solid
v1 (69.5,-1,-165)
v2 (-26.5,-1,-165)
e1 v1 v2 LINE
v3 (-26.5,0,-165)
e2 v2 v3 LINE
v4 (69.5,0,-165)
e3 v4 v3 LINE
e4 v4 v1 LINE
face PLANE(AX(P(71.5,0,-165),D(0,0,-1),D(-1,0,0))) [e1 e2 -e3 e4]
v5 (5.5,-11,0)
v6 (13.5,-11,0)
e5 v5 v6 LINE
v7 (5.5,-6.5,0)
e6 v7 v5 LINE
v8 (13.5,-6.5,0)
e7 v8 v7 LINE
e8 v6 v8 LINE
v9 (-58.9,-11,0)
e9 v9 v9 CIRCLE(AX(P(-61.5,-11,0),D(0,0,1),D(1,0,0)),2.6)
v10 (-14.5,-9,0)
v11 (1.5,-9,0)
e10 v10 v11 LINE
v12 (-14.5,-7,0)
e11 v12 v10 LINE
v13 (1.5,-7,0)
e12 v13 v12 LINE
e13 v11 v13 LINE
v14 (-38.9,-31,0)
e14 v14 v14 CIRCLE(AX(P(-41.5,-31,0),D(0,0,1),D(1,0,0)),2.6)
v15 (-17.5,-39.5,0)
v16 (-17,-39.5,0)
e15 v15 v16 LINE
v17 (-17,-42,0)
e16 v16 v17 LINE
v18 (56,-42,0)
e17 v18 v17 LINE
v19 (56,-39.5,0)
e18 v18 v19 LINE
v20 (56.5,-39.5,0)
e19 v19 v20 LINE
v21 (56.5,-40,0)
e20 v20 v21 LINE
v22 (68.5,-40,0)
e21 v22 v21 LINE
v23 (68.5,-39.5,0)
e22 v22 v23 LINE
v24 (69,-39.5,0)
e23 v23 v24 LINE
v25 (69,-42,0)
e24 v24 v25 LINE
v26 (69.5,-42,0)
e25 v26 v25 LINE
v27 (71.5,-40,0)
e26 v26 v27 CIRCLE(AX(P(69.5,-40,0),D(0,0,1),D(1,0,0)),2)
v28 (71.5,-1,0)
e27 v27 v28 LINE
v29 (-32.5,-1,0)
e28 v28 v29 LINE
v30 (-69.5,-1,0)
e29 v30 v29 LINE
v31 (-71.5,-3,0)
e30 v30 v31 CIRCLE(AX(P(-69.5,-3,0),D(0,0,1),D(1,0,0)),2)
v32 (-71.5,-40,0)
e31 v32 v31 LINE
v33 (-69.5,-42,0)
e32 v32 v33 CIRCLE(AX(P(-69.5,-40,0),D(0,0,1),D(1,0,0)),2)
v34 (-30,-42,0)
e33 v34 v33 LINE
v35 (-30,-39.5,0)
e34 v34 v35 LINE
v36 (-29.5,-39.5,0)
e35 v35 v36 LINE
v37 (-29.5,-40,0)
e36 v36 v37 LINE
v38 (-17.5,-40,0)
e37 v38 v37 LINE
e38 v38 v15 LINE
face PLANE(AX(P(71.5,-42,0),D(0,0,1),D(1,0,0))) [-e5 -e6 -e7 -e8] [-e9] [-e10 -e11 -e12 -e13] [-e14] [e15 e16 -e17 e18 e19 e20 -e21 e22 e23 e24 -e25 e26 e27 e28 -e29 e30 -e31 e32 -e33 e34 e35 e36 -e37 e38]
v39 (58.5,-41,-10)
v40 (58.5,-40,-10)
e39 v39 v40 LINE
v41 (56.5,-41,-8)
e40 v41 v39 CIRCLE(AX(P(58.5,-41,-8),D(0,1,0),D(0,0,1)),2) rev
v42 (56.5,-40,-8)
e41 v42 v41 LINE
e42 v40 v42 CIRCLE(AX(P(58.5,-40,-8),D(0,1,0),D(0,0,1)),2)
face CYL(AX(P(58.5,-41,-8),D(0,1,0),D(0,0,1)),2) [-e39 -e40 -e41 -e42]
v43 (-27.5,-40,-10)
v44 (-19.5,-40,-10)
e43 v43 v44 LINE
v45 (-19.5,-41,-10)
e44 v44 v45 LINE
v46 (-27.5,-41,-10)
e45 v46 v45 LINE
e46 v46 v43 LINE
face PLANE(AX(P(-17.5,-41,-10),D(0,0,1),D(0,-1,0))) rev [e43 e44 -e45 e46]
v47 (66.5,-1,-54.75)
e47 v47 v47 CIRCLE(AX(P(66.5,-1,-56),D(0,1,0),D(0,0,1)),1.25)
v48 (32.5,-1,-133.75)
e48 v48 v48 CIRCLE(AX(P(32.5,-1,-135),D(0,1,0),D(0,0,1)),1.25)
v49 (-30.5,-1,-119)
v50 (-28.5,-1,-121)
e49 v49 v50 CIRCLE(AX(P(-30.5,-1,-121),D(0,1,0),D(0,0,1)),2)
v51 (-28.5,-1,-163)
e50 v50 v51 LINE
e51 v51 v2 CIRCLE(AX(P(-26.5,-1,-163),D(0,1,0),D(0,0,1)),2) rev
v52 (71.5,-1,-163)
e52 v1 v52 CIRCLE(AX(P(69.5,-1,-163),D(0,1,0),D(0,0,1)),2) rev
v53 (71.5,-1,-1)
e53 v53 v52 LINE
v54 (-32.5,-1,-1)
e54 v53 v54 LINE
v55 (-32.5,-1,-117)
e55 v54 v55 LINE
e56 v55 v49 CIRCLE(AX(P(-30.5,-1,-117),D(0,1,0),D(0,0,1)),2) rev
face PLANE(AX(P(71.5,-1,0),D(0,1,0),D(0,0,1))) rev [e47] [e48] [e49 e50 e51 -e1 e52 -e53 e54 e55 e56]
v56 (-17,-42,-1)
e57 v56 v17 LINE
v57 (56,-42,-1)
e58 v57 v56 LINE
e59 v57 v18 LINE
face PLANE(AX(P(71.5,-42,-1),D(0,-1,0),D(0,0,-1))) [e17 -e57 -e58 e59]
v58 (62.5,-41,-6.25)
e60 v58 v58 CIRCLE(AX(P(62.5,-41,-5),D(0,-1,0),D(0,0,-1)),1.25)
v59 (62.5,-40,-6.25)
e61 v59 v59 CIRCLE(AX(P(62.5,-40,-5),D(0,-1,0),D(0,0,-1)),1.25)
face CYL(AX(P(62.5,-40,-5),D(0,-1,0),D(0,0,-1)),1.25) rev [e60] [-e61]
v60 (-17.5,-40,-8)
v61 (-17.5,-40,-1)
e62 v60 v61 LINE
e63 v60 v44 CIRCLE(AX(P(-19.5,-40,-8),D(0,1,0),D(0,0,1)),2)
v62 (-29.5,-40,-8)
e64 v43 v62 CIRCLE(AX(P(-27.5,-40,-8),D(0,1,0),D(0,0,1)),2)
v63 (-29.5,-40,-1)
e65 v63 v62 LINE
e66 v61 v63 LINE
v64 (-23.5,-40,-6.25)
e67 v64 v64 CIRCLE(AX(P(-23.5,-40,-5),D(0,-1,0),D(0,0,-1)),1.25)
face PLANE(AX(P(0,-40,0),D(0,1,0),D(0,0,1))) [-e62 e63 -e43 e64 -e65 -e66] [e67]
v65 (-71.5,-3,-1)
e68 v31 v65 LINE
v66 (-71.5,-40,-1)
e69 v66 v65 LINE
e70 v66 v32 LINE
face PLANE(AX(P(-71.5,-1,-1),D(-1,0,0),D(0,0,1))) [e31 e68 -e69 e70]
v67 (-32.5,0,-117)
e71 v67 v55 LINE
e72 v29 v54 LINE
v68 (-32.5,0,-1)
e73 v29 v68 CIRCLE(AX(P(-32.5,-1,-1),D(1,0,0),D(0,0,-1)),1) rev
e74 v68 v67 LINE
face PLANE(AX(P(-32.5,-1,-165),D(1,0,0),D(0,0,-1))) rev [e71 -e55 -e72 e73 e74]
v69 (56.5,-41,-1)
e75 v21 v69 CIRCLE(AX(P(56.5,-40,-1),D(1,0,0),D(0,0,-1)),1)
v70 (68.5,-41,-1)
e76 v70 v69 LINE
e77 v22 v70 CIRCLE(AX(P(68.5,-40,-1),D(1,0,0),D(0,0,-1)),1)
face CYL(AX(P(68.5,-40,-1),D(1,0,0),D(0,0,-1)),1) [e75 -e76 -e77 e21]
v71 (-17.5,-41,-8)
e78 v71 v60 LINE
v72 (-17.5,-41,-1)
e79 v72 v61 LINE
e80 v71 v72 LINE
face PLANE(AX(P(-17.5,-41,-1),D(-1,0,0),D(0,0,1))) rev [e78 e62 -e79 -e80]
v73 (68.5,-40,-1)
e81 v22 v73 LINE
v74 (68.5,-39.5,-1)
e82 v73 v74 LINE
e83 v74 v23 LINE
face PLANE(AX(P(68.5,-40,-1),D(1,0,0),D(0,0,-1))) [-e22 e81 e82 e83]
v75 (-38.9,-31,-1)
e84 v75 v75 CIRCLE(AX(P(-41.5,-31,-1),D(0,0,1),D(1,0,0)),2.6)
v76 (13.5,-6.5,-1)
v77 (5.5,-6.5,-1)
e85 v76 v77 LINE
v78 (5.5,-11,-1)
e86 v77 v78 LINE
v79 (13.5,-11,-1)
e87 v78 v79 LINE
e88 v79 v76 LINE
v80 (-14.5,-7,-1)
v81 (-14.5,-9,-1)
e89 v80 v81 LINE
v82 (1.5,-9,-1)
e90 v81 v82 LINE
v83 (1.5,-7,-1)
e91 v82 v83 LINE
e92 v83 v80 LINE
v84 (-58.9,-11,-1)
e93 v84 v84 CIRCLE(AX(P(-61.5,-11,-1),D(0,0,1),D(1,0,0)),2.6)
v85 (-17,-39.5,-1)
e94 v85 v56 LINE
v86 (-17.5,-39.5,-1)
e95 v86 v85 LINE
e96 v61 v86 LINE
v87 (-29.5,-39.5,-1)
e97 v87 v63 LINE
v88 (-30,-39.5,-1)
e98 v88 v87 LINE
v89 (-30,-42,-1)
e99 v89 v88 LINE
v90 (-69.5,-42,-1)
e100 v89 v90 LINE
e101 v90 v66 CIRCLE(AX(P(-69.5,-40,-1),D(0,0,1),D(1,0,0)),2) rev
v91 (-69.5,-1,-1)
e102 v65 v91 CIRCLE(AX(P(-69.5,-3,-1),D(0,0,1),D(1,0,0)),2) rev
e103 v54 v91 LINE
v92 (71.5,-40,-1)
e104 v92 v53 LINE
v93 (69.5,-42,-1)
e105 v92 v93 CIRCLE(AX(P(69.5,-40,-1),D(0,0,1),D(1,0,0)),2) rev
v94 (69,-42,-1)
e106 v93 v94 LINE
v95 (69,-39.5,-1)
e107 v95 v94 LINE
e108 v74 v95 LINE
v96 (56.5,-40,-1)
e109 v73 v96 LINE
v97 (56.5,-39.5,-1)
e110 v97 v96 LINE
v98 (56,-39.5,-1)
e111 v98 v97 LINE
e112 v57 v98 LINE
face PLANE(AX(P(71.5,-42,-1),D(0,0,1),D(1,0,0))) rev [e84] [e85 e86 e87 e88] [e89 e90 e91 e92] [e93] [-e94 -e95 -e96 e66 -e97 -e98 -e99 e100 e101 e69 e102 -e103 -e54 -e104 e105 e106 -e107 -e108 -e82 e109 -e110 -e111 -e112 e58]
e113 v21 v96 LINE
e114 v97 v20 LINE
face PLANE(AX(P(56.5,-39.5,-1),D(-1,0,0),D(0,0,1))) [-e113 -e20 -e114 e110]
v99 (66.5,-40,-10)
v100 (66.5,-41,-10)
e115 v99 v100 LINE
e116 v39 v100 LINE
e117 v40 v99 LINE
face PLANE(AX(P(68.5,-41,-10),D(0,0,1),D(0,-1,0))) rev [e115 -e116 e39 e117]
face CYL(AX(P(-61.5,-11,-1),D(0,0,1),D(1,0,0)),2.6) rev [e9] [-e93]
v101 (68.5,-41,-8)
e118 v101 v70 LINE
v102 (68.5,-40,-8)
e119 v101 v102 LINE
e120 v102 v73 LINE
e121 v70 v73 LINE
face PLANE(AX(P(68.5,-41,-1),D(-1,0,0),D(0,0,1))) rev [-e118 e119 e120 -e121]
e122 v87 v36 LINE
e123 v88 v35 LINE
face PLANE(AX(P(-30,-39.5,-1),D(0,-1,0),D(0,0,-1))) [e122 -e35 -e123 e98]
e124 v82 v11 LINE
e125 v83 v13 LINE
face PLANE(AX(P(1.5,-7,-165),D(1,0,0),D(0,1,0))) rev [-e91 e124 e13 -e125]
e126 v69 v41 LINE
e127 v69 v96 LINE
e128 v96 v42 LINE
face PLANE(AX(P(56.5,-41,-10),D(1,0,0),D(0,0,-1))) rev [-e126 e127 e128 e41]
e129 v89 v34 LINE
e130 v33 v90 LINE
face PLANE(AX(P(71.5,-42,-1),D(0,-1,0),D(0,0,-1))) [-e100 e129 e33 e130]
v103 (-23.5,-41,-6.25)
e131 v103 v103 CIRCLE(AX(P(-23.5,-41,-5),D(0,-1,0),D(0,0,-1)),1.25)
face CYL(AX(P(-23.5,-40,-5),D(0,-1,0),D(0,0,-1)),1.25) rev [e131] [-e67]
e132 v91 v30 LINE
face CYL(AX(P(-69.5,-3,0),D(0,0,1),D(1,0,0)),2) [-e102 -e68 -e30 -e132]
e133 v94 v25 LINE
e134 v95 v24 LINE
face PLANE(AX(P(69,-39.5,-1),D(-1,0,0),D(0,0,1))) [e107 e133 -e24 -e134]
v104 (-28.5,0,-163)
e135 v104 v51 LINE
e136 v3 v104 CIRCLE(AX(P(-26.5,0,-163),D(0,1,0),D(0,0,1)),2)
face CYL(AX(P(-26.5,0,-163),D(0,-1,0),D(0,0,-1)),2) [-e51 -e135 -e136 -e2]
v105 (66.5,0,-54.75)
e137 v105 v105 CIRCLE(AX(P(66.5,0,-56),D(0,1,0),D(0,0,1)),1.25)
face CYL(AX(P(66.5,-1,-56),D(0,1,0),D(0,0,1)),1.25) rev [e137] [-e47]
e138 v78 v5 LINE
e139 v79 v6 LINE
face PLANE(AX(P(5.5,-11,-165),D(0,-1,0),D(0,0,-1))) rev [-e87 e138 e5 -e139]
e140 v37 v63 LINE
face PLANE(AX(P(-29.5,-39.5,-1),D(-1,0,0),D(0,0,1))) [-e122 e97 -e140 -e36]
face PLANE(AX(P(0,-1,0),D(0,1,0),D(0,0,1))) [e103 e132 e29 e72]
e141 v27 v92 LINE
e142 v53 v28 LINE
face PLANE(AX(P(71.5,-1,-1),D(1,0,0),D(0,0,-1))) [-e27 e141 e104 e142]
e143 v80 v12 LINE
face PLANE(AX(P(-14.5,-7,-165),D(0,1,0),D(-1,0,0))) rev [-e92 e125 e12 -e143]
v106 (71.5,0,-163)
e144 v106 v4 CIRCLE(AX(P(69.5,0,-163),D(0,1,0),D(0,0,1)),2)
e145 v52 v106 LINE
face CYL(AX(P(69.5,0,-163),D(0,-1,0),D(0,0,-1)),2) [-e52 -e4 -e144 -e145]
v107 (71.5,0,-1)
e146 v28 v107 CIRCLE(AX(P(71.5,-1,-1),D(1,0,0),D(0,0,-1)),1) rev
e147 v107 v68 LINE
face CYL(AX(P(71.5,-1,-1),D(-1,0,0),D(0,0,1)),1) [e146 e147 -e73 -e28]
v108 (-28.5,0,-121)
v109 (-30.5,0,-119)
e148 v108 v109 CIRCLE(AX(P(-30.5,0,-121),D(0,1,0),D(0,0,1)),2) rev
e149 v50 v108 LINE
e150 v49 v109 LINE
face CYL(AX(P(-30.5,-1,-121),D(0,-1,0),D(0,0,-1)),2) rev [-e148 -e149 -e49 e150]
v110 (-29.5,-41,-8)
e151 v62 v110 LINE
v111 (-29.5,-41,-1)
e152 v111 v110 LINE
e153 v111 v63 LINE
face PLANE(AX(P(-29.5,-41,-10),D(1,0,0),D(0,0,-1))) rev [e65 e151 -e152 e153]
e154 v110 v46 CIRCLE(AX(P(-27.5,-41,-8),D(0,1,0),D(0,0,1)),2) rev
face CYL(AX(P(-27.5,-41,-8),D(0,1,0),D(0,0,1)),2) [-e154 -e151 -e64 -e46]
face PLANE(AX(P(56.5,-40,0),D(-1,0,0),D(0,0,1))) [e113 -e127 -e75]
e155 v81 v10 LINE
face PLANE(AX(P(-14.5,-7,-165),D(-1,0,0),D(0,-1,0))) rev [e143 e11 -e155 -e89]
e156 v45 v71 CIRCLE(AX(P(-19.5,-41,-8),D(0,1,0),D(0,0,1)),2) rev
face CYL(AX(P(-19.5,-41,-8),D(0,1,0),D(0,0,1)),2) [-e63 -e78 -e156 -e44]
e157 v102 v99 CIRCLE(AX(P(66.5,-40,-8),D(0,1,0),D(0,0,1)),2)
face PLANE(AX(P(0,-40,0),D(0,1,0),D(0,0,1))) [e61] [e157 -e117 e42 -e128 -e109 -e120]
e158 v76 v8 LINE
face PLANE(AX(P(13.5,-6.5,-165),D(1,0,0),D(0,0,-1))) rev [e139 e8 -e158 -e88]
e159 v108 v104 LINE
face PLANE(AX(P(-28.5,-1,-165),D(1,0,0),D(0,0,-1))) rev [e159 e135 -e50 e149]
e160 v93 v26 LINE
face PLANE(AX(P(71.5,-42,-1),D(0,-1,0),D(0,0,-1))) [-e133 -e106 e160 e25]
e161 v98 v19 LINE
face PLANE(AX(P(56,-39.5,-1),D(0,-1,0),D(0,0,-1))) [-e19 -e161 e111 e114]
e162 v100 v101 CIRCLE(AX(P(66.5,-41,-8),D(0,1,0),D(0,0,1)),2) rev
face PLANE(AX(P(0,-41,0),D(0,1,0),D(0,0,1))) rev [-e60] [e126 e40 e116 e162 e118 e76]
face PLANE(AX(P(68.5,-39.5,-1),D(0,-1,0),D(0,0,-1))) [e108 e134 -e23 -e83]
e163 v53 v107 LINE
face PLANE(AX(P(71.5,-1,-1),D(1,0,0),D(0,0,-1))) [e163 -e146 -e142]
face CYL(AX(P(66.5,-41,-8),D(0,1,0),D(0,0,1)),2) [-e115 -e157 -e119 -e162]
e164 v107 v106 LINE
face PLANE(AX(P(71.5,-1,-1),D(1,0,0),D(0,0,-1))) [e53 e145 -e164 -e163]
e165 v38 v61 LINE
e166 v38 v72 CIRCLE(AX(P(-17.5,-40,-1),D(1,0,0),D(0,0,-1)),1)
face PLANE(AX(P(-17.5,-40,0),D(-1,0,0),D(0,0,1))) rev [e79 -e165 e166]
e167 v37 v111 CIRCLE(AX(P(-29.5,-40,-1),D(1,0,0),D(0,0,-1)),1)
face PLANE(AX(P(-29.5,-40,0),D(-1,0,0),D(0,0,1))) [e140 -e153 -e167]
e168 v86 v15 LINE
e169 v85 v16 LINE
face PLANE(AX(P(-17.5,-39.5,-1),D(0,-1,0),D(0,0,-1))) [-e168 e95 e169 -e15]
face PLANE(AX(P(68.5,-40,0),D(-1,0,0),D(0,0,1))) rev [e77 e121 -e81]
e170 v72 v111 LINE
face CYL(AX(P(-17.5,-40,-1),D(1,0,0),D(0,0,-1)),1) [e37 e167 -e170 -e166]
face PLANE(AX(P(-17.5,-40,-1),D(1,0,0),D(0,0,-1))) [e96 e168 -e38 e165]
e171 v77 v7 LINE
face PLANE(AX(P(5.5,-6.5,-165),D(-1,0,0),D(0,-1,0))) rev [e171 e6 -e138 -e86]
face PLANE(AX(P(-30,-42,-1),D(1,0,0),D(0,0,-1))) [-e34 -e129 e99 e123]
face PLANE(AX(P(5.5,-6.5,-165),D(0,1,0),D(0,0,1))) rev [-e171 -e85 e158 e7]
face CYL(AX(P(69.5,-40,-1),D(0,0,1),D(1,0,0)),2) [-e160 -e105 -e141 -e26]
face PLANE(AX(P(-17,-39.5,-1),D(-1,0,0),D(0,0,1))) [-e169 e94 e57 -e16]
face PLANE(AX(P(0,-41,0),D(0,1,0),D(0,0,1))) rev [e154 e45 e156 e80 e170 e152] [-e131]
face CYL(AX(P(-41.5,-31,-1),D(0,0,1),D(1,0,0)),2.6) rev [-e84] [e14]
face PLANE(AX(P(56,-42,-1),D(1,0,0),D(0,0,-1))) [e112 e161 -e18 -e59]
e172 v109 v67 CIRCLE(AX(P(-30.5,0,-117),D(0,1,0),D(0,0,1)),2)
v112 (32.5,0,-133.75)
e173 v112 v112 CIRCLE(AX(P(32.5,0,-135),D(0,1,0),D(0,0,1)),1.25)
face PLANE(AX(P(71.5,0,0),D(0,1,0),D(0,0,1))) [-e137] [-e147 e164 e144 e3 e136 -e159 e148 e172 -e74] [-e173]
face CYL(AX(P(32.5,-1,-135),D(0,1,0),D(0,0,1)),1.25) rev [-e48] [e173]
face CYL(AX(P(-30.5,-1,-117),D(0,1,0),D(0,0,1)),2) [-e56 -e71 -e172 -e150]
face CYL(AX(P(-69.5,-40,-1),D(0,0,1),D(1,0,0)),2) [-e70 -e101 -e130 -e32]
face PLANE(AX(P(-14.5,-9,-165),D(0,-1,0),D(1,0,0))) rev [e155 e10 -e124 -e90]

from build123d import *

# Parameters (mm, degrees)
BASE_FLANGE1_START       = -71.5
BASE_FLANGE1_DEPTH       = 143
SKETCH6_W                = 39
SKETCH6_H                = 165
CUT_EXTRUDE1_DEPTH       = 1
SKETCH7_W                = 4
SKETCH7_H                = 46
CUT_EXTRUDE2_DEPTH       = 10
SKETCH8_R                = 2.6
CUT_EXTRUDE3_DEPTH       = 1
SKETCH9_W                = 16
SKETCH9_H                = 2
SKETCH9_W_2              = 8
SKETCH9_H_2              = 4.5
CUT_EXTRUDE4_DEPTH       = 185.66523766
SKETCH10_R               = 1.25
CUT_EXTRUDE5_DEPTH       = 1
EDGE_FLANGE1_START       = 56
EDGE_FLANGE1_DEPTH       = 13
EDGE_FLANGE1_2_DEPTH     = 0.5
EDGE_FLANGE1_START_2     = 68.5
EDGE_FLANGE1_3_DEPTH     = 0.5
EDGE_FLANGE1_START_3     = 56.5
EDGE_FLANGE1_4_OUTLINE_W = 1
EDGE_FLANGE1_4_OUTLINE_H = 9
EDGE_FLANGE1_4_DEPTH     = 12
EDGE_FLANGE2_START       = -30
EDGE_FLANGE2_DEPTH       = 13
EDGE_FLANGE2_2_DEPTH     = 0.5
EDGE_FLANGE2_START_2     = -17.5
EDGE_FLANGE2_3_DEPTH     = 0.5
EDGE_FLANGE2_START_3     = -29.5
EDGE_FLANGE2_4_OUTLINE_W = 1
EDGE_FLANGE2_4_OUTLINE_H = 9
EDGE_FLANGE2_4_DEPTH     = 12
SKETCH17_R               = 1.25
CUT_EXTRUDE6_DEPTH       = 1
FILLET1_R                = 2


# Read off the part's stored shape, not the designer's step: Base-Flange1, Edge-Flange1, Edge-Flange2
with BuildPart() as part:
    # Base-Flange1 outline → Base-Flange1 (new body)
    with BuildSketch(Plane(origin=(0, 0, 0), x_dir=(0, 0, -1), z_dir=(1, 0, 0)).offset(BASE_FLANGE1_START)):
        with BuildLine():
            Line((1, -1), (165, -1))
            Line((165, -1), (165, 0))
            Line((165, 0), (1, 0))
            ThreePointArc((1, 0), (0.292893219, -0.292893219), (0, -1))
            Line((0, -1), (0, -42))
            Line((0, -42), (1, -42))
            Line((1, -42), (1, -1))
        make_face()
    extrude(amount=BASE_FLANGE1_DEPTH)

    # Sketch6 → Cut-Extrude1 (cut)
    with BuildSketch(Plane(origin=(0, 0, 0), x_dir=(1, 0, 0), z_dir=(0, 1, 0))):
        with Locations((-52, 82.5)):
            Rectangle(SKETCH6_W, SKETCH6_H)
    extrude(amount=-CUT_EXTRUDE1_DEPTH, mode=Mode.SUBTRACT)

    # Sketch7 → Cut-Extrude2 (cut)
    with BuildSketch(Plane(origin=(0, 0, 0), x_dir=(1, 0, 0), z_dir=(0, 1, 0))):
        with Locations((-30.5, 142)):
            Rectangle(SKETCH7_W, SKETCH7_H)
    extrude(amount=-CUT_EXTRUDE2_DEPTH, mode=Mode.SUBTRACT)

    # Sketch8 → Cut-Extrude3 (cut)
    with BuildSketch(Plane.XY):
        with Locations((-61.5, -11)):
            Circle(SKETCH8_R)
        with Locations((-41.5, -31)):
            Circle(SKETCH8_R)
    extrude(amount=-CUT_EXTRUDE3_DEPTH, mode=Mode.SUBTRACT)

    # Sketch9 → Cut-Extrude4 (cut, through all)
    with BuildSketch(Plane.XY):
        with Locations((-6.5, -8)):
            Rectangle(SKETCH9_W, SKETCH9_H)
        with Locations((9.5, -8.75)):
            Rectangle(SKETCH9_W_2, SKETCH9_H_2)
    extrude(amount=-CUT_EXTRUDE4_DEPTH, mode=Mode.SUBTRACT)

    # Sketch10 → Cut-Extrude5 (cut)
    with BuildSketch(Plane(origin=(0, 0, 0), x_dir=(1, 0, 0), z_dir=(0, 1, 0))):
        with Locations(Location((66.5, 56, 0), (0, 0, 270))):
            Circle(SKETCH10_R)
        with Locations(Location((32.5, 135, 0), (0, 0, 270))):
            Circle(SKETCH10_R)
    extrude(amount=-CUT_EXTRUDE5_DEPTH, mode=Mode.SUBTRACT)

    # Edge-Flange1 outline → Edge-Flange1 (cut)
    with BuildSketch(Plane.YZ.offset(EDGE_FLANGE1_START)):
        with BuildLine():
            ThreePointArc((-41, -1), (-40.707106781, -0.292893219), (-40, 0))
            Line((-40, 0), (-42, 0))
            Line((-42, 0), (-42, -1))
            Line((-42, -1), (-41, -1))
        make_face()
    extrude(amount=EDGE_FLANGE1_DEPTH, mode=Mode.SUBTRACT)

    # Edge-Flange1 2 outline → Edge-Flange1 2 (cut)
    with BuildSketch(Plane.YZ.offset(EDGE_FLANGE1_START)):
        with BuildLine():
            Line((-39.5, -1), (-39.5, 0))
            Line((-39.5, 0), (-40, 0))
            ThreePointArc((-40, 0), (-40.707106781, -0.292893219), (-41, -1))
            Line((-41, -1), (-39.5, -1))
        make_face()
    extrude(amount=EDGE_FLANGE1_2_DEPTH, mode=Mode.SUBTRACT)

    # Edge-Flange1 3 outline → Edge-Flange1 3 (cut)
    with BuildSketch(Plane.YZ.offset(EDGE_FLANGE1_START_2)):
        with BuildLine():
            Line((-39.5, -1), (-39.5, 0))
            Line((-39.5, 0), (-40, 0))
            ThreePointArc((-40, 0), (-40.707106781, -0.292893219), (-41, -1))
            Line((-41, -1), (-39.5, -1))
        make_face()
    extrude(amount=EDGE_FLANGE1_3_DEPTH, mode=Mode.SUBTRACT)

    # Edge-Flange1 4 outline → Edge-Flange1 4 (add)
    with BuildSketch(Plane.YZ.offset(EDGE_FLANGE1_START_3)):
        with Locations((-40.5, -5.5)):
            Rectangle(EDGE_FLANGE1_4_OUTLINE_W, EDGE_FLANGE1_4_OUTLINE_H)
    extrude(amount=EDGE_FLANGE1_4_DEPTH)

    # Edge-Flange2 outline → Edge-Flange2 (cut)
    with BuildSketch(Plane.YZ.offset(EDGE_FLANGE2_START)):
        with BuildLine():
            ThreePointArc((-41, -1), (-40.707106781, -0.292893219), (-40, 0))
            Line((-40, 0), (-42, 0))
            Line((-42, 0), (-42, -1))
            Line((-42, -1), (-41, -1))
        make_face()
    extrude(amount=EDGE_FLANGE2_DEPTH, mode=Mode.SUBTRACT)

    # Edge-Flange2 2 outline → Edge-Flange2 2 (cut)
    with BuildSketch(Plane.YZ.offset(EDGE_FLANGE2_START)):
        with BuildLine():
            Line((-39.5, -1), (-39.5, 0))
            Line((-39.5, 0), (-40, 0))
            ThreePointArc((-40, 0), (-40.707106781, -0.292893219), (-41, -1))
            Line((-41, -1), (-39.5, -1))
        make_face()
    extrude(amount=EDGE_FLANGE2_2_DEPTH, mode=Mode.SUBTRACT)

    # Edge-Flange2 3 outline → Edge-Flange2 3 (cut)
    with BuildSketch(Plane.YZ.offset(EDGE_FLANGE2_START_2)):
        with BuildLine():
            Line((-39.5, -1), (-39.5, 0))
            Line((-39.5, 0), (-40, 0))
            ThreePointArc((-40, 0), (-40.707106781, -0.292893219), (-41, -1))
            Line((-41, -1), (-39.5, -1))
        make_face()
    extrude(amount=EDGE_FLANGE2_3_DEPTH, mode=Mode.SUBTRACT)

    # Edge-Flange2 4 outline → Edge-Flange2 4 (add)
    with BuildSketch(Plane.YZ.offset(EDGE_FLANGE2_START_3)):
        with Locations((-40.5, -5.5)):
            Rectangle(EDGE_FLANGE2_4_OUTLINE_W, EDGE_FLANGE2_4_OUTLINE_H)
    extrude(amount=EDGE_FLANGE2_4_DEPTH)

    # Sketch17 → Cut-Extrude6 (cut)
    with BuildSketch(Plane.XZ.offset(41)):
        with Locations(Location((-23.5, -5, 0), (0, 0, 270))):
            Circle(SKETCH17_R)
        with Locations(Location((62.5, -5, 0), (0, 0, 270))):
            Circle(SKETCH17_R)
    extrude(amount=-CUT_EXTRUDE6_DEPTH, mode=Mode.SUBTRACT)

    # Fillet1
    fillet1_edges = [part.edges().sort_by_distance(p)[0] for p in [
        (71.5, -42, -0.5),
        (71.5, -0.5, -165),
        (-28.5, -0.5, -165),
        (-28.5, -0.5, -119),
        (-32.5, -0.5, -119),
        (-71.5, -42, -0.5),
        (-71.5, -1, -0.5),
        (-29.5, -40.5, -10),
        (-17.5, -40.5, -10),
        (56.5, -40.5, -10),
        (68.5, -40.5, -10),
    ]]
    fillet(fillet1_edges, radius=FILLET1_R - 0.0001)  # a hair under: the kernel refuses the full size


solid = part.part
